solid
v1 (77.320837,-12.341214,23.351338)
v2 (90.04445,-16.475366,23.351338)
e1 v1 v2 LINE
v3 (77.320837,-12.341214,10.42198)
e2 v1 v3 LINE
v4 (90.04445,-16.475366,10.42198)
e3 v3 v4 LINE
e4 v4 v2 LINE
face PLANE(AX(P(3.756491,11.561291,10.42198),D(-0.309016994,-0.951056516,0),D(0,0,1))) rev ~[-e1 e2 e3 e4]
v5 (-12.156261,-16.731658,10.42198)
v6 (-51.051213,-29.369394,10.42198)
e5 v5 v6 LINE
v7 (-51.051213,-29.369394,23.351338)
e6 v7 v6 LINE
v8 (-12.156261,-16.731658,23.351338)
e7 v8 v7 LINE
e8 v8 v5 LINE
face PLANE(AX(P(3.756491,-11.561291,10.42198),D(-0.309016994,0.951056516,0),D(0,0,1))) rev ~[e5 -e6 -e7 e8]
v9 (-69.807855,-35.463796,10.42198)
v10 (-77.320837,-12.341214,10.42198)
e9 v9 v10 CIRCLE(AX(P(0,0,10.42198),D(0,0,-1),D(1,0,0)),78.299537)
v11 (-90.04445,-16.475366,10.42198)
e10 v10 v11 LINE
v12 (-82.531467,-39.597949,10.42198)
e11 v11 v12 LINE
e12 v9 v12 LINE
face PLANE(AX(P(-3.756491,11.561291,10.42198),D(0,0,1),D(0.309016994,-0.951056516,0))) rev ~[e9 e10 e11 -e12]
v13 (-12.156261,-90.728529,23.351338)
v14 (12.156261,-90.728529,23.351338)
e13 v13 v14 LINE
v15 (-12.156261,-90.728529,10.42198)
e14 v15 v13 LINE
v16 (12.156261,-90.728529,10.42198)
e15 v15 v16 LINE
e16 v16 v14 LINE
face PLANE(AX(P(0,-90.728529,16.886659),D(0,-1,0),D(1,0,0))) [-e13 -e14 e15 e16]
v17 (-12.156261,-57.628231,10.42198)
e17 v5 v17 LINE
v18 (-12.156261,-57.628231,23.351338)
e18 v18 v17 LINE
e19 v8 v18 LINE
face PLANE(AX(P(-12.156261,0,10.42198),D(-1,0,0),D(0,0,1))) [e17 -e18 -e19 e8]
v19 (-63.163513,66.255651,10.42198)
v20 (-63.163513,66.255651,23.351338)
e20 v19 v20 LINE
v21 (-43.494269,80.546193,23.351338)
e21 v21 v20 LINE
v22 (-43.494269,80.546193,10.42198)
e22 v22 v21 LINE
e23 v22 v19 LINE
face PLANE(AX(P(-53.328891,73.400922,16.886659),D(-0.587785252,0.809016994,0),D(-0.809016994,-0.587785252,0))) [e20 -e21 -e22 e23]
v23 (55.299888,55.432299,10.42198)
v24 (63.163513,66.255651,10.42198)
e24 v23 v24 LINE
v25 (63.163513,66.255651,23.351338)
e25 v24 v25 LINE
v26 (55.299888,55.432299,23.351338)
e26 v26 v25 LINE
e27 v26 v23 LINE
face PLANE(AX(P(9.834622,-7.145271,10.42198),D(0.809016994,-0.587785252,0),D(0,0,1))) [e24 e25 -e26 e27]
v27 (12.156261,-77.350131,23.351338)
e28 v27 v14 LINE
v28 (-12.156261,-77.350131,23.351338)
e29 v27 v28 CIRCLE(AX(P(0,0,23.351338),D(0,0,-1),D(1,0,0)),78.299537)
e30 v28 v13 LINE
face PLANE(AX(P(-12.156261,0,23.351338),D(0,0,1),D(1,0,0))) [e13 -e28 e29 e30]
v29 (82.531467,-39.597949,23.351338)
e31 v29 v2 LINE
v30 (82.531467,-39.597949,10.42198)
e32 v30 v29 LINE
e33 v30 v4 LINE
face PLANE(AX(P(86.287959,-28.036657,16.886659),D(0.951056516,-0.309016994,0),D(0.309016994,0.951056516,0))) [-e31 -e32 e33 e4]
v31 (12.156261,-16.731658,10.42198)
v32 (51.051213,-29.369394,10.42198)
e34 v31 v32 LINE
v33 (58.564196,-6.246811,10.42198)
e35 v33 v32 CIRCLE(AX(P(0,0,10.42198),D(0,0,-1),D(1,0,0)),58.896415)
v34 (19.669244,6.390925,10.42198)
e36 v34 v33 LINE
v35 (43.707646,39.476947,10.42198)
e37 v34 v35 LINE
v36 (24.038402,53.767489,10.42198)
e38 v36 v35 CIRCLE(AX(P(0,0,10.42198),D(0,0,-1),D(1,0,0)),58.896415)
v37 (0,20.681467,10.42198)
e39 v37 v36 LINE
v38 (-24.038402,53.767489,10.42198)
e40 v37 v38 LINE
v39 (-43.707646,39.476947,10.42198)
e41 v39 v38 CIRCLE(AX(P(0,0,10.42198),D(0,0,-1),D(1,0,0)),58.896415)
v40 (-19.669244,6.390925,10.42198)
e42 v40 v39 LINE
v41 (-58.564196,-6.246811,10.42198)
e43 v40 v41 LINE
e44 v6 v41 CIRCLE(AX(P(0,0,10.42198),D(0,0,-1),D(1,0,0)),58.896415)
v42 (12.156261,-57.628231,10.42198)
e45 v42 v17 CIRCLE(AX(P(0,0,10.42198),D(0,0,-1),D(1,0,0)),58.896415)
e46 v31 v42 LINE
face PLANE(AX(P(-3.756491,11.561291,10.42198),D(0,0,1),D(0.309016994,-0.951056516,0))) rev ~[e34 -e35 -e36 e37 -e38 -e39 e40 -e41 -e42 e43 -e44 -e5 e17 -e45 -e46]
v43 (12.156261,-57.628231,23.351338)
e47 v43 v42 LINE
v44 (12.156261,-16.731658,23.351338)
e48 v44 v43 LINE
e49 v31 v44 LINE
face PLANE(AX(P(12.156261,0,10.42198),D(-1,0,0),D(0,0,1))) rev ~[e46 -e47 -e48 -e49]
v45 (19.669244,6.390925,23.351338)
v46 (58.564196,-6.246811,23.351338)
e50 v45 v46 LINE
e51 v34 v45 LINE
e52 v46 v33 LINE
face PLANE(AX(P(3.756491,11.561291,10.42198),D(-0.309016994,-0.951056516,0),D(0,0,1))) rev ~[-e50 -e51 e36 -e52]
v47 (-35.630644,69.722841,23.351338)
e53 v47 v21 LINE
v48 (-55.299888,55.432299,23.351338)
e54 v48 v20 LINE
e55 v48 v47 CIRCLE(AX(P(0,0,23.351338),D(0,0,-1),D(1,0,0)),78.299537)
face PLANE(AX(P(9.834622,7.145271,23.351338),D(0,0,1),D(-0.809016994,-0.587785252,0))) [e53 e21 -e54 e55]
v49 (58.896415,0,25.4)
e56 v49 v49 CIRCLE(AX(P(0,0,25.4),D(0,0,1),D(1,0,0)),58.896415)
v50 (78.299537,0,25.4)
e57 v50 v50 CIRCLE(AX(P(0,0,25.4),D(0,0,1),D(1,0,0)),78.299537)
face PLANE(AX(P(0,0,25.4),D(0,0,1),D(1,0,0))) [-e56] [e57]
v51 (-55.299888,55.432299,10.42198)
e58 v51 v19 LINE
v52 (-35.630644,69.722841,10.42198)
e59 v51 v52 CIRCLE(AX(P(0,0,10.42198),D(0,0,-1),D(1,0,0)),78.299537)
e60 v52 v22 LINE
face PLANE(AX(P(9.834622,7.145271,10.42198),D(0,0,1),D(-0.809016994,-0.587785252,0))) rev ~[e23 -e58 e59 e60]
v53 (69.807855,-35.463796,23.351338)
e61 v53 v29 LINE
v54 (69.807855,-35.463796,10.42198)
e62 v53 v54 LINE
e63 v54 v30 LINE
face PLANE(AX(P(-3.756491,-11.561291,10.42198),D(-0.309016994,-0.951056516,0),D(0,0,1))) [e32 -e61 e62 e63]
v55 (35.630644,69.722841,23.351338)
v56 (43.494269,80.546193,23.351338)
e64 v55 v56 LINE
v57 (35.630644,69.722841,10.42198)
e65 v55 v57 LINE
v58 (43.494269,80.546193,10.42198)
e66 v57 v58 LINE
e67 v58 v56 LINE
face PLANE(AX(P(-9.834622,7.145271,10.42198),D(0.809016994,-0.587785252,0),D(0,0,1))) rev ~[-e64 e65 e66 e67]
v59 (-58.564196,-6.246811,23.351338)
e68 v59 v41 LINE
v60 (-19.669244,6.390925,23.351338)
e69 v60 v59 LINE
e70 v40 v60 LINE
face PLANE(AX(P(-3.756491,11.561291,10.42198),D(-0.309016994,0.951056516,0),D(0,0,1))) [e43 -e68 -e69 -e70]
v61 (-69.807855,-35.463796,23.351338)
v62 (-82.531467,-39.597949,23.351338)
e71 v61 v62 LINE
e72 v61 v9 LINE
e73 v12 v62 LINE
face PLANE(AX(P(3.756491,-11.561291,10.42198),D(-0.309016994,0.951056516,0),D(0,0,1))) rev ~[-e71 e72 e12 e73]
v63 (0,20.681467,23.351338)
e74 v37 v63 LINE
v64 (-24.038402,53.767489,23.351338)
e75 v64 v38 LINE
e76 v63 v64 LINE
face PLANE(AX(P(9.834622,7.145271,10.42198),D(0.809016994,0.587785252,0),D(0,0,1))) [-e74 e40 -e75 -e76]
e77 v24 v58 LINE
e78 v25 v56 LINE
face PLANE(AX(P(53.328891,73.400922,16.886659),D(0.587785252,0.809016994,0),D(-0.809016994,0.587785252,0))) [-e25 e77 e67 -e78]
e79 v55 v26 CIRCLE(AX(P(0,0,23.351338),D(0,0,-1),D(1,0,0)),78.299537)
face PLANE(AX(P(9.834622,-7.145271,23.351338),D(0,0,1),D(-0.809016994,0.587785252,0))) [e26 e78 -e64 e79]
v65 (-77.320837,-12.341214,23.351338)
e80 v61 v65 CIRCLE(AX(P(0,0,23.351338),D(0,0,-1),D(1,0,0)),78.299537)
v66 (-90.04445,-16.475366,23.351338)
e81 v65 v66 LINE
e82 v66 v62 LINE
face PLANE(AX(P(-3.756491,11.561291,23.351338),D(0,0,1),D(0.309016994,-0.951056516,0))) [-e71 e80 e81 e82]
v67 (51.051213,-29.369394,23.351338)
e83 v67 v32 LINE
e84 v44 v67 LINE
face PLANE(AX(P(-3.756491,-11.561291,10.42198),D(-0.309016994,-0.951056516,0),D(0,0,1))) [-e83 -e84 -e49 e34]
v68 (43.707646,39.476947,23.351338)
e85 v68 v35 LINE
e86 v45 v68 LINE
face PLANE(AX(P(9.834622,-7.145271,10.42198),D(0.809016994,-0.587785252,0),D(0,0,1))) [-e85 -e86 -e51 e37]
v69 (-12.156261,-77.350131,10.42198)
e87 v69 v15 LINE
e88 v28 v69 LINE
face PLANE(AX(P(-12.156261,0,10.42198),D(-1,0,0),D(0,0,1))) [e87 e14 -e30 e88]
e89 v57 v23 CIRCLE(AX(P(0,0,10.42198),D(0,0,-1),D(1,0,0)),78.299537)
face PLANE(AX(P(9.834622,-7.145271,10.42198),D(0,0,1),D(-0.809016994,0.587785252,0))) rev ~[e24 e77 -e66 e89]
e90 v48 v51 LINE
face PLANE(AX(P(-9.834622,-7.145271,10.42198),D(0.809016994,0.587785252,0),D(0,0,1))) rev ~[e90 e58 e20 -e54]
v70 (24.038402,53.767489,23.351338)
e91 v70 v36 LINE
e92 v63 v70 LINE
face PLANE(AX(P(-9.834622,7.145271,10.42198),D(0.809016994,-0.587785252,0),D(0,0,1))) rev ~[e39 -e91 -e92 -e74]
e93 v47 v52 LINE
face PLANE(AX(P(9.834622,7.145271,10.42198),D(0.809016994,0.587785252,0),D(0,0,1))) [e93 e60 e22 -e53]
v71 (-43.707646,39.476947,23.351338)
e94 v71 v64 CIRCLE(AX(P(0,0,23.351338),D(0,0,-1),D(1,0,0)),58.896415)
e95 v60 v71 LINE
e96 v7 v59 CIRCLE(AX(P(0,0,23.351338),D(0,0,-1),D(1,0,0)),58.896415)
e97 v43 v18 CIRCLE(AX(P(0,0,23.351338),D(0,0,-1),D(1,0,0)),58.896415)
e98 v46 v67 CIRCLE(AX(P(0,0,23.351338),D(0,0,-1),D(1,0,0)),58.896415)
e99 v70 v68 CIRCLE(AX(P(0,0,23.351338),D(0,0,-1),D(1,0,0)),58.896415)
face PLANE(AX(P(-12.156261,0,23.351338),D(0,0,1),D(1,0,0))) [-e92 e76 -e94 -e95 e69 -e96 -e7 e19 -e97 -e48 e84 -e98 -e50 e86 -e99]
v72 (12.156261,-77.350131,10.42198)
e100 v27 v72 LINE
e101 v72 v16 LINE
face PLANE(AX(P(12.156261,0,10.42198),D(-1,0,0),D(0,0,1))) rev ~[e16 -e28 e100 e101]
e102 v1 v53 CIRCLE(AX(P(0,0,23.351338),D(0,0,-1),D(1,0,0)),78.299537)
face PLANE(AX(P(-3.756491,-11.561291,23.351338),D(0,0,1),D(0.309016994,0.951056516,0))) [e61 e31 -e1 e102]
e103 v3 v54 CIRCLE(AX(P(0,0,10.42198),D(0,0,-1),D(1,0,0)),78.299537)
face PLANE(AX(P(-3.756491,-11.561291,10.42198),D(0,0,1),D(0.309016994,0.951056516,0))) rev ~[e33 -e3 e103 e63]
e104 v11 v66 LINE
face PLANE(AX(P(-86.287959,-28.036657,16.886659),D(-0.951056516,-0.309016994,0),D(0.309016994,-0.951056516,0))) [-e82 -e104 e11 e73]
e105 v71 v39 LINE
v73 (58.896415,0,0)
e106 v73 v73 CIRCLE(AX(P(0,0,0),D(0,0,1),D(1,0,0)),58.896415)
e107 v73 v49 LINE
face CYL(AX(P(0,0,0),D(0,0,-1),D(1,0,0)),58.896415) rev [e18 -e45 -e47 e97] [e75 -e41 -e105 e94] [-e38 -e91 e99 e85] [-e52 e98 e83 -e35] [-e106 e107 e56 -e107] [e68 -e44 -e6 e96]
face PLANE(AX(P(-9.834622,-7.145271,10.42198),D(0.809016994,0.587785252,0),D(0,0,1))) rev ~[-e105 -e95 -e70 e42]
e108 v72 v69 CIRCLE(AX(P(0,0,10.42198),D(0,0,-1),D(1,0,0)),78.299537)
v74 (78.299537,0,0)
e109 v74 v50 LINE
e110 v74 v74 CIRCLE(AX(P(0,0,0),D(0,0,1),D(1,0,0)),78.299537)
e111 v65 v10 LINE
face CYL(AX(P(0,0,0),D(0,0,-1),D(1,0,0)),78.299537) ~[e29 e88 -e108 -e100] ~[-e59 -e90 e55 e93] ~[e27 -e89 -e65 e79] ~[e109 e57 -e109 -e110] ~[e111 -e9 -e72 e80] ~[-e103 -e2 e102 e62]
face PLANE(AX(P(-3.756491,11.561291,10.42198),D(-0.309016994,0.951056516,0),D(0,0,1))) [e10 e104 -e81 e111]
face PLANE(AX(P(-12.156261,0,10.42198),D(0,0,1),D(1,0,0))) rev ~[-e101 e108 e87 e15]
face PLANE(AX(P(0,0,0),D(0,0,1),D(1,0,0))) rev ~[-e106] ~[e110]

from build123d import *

# Parameters (mm, degrees)
F0_R            = 78.299536584
F0_R_2          = 58.8964149972
F1_DEPTH        = 25.4
F2_W            = 24.3125222623
F2_H            = 12.9293575883
F3_DEPTH        = 90.7285287976
F3_COPIES_COUNT = 5


# Not quite as in the source:
# - a pattern or mirror of a feature is missing from the dataset's text; its kind, count and spacing are read off the source's solid


with BuildPart() as f1:
    # F0 (on Top) → F1 (new body)
    with BuildSketch(Plane.XY):
        Circle(F0_R)
        Circle(F0_R_2, mode=Mode.SUBTRACT)
    extrude(amount=F1_DEPTH)

    # F2 (on Front) → F3 (join)
    with BuildSketch(Plane.XZ):
        with Locations((0, 16.8866589665)):
            Rectangle(F2_W, F2_H)
    f3 = extrude(amount=F3_DEPTH)

    # F3_copies: F3 ×5 about axis
    f3_copies_axis = Axis((0, 0, 0), (0, 0, 1))
    for i in range(1, F3_COPIES_COUNT):
        add(f3.rotate(f3_copies_axis, i * 360 / F3_COPIES_COUNT))


solid = f1.part
